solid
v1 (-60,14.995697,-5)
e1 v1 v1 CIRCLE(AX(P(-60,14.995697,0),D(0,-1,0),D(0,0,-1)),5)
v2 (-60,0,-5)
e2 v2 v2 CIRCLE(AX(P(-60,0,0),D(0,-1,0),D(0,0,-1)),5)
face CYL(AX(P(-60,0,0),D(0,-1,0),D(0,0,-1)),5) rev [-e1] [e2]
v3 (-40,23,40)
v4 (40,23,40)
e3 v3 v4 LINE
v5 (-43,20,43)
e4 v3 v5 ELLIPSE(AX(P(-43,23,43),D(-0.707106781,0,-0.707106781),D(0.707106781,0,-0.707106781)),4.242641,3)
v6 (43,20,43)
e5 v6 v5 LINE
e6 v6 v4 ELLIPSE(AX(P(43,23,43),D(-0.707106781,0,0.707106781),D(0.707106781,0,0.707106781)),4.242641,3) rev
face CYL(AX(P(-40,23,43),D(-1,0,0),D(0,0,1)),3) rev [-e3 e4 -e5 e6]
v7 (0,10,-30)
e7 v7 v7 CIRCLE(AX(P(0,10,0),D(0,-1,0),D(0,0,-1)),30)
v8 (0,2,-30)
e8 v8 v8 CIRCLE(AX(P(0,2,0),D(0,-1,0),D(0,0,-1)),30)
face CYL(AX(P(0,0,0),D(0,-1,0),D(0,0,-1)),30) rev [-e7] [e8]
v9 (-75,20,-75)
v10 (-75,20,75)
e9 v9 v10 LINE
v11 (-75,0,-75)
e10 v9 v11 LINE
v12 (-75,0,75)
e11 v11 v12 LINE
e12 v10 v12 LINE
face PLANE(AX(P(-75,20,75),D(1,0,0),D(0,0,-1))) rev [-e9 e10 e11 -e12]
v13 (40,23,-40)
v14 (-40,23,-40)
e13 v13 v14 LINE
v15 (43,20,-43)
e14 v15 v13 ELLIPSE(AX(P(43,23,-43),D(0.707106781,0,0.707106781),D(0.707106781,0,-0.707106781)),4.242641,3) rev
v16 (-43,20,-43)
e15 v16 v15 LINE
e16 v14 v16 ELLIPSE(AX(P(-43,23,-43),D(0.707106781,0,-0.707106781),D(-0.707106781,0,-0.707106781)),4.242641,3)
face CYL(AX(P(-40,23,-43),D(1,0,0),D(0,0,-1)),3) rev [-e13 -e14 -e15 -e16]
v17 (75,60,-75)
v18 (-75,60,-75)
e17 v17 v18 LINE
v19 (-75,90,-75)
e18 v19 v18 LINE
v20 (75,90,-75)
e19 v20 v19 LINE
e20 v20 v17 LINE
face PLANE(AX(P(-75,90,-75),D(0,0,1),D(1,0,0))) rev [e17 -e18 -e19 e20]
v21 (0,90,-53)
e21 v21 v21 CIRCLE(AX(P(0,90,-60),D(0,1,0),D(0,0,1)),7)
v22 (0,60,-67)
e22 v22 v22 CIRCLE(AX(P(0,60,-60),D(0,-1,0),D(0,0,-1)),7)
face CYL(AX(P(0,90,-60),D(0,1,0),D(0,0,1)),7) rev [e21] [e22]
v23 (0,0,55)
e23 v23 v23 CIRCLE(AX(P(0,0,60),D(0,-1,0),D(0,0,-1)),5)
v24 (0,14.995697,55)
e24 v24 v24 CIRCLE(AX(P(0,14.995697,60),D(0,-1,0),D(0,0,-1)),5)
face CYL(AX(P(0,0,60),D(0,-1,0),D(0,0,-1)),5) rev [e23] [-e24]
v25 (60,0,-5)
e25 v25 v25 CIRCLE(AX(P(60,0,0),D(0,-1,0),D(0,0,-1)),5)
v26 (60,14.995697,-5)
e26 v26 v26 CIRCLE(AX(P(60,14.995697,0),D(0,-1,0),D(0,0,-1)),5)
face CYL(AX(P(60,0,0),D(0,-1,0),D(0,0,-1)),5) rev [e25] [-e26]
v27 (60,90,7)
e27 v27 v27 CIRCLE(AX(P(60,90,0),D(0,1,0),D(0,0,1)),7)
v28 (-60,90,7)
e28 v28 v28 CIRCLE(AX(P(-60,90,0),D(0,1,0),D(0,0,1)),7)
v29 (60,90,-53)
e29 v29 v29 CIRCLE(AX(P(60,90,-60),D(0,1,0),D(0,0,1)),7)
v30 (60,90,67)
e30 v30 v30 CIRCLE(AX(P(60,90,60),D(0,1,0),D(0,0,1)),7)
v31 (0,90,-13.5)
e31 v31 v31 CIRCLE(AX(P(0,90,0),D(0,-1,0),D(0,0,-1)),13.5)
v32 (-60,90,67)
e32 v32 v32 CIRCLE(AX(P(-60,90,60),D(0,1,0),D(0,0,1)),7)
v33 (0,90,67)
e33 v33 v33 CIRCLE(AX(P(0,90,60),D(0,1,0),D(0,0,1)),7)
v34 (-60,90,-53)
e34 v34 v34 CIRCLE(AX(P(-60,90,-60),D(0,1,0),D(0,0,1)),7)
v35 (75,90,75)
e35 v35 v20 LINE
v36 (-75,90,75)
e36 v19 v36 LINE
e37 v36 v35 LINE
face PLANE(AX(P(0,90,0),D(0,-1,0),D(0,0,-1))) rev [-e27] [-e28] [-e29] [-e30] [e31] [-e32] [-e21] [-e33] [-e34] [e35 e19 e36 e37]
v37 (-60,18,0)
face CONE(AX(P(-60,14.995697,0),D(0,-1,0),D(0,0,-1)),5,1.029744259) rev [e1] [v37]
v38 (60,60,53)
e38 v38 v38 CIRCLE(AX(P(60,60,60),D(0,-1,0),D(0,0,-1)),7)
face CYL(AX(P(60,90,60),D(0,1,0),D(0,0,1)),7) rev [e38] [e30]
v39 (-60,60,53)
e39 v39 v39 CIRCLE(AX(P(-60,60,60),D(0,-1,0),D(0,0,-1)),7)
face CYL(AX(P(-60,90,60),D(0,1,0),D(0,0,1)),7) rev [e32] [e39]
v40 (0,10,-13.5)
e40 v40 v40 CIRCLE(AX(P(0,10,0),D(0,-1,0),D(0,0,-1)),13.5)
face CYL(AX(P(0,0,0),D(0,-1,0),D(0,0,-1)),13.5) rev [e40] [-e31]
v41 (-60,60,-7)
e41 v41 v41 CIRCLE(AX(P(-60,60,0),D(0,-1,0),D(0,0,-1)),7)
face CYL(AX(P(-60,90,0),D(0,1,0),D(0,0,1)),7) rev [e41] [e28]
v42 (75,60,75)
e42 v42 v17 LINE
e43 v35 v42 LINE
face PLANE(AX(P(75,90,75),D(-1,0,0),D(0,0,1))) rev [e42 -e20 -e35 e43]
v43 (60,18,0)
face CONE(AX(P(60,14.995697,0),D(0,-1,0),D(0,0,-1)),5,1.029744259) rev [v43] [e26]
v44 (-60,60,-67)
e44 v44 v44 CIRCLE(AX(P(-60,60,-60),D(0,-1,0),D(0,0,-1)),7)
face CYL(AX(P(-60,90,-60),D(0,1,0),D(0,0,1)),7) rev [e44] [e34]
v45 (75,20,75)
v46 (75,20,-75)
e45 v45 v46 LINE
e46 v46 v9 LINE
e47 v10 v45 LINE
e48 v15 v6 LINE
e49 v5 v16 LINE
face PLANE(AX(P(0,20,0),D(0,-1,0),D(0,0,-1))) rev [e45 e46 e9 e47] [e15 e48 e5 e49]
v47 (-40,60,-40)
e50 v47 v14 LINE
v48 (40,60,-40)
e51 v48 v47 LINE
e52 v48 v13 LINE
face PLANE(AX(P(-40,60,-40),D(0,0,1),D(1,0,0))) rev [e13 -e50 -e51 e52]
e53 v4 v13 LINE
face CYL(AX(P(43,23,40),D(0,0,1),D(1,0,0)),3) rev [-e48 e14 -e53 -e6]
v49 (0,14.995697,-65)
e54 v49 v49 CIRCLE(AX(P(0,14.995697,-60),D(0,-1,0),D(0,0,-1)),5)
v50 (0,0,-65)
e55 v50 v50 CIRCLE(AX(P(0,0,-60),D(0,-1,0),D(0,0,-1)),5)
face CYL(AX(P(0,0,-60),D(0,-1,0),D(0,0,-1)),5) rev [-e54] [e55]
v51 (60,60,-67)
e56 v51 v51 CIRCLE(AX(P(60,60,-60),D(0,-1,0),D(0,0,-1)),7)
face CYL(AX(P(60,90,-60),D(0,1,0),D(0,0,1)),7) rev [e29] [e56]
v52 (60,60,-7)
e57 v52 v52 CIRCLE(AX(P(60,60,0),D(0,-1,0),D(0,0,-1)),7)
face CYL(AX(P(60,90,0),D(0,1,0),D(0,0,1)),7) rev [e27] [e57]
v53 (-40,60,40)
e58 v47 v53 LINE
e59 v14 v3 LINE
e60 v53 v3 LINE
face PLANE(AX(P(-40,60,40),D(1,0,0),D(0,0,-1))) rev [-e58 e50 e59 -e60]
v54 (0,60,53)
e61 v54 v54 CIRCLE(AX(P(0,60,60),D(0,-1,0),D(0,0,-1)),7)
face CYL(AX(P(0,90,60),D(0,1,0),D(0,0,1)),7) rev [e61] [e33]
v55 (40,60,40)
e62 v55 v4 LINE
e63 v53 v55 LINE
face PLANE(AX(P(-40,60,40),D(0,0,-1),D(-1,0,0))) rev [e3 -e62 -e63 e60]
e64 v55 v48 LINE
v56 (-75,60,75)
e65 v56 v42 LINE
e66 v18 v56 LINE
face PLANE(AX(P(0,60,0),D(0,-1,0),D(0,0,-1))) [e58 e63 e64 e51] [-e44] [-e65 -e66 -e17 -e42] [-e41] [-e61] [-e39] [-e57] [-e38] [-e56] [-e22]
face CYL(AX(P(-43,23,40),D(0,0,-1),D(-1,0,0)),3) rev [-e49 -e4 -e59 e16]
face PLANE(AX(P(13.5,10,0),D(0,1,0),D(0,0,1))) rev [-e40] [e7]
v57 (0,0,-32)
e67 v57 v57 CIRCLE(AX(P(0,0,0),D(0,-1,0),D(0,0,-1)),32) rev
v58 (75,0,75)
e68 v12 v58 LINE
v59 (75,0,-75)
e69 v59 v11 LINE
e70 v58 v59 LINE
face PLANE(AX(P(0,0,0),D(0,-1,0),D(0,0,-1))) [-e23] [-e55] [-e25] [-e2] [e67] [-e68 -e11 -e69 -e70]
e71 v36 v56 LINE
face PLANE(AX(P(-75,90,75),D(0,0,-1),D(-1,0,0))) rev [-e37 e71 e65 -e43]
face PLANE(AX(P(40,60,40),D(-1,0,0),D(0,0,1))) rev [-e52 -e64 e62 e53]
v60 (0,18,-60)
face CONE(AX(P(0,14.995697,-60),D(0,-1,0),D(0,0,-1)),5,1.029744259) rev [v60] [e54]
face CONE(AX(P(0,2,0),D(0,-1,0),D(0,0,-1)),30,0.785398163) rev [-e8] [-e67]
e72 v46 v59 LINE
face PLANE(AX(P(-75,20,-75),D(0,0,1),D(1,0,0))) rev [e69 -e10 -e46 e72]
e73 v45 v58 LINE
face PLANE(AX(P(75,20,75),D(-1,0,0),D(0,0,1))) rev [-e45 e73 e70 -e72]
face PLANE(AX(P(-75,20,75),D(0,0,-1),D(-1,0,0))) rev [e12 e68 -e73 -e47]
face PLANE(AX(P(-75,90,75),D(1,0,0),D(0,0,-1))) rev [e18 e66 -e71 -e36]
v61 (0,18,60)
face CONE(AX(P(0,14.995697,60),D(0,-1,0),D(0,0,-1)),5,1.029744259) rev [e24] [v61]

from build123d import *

# Parameters (mm, degrees)
SKETCH1_W                      = 150
SKETCH1_H                      = 150
BOSS_EXTRUDE1_DEPTH            = 20
SKETCH2_W                      = 80
SKETCH2_H                      = 80
BOSS_EXTRUDE2_DEPTH            = 40
SKETCH3_W                      = 150
SKETCH3_H                      = 150
BOSS_EXTRUDE3_DEPTH            = 30
HOLE2_D                        = 27
HOLE2_CBORE_D                  = 60
HOLE2_CBORE_DEPTH              = 10
M16_START                      = 60
M16_TAPPED_HOLE1_OUTLINE_R     = 7
M16_TAPPED_HOLE1_DEPTH         = 30
F_10_0_10_DIAMETER_HOLE1_D     = 10
F_10_0_10_DIAMETER_HOLE1_DEPTH = 14.995696905
F_10_0_10_DIAMETER_HOLE1_TIP   = 3.004303095
FILLET1_R                      = 3
CHAMFER1_SIZE                  = 2


# Read off the part's stored shape, not the designer's step: M16 Tapped Hole1
with BuildPart() as part:
    # Sketch1 → Boss-Extrude1 (new body)
    with BuildSketch(Plane(origin=(0, 0, 0), x_dir=(1, 0, 0), z_dir=(0, 1, 0))):
        Rectangle(SKETCH1_W, SKETCH1_H)
    extrude(amount=BOSS_EXTRUDE1_DEPTH)

    # Sketch2 → Boss-Extrude2 (add)
    with BuildSketch(Plane(origin=(0, 20, 0), x_dir=(1, 0, 0), z_dir=(0, 1, 0))):
        Rectangle(SKETCH2_W, SKETCH2_H)
    extrude(amount=BOSS_EXTRUDE2_DEPTH)

    # Sketch3 → Boss-Extrude3 (add)
    with BuildSketch(Plane(origin=(0, 60, 0), x_dir=(1, 0, 0), z_dir=(0, 1, 0))):
        Rectangle(SKETCH3_W, SKETCH3_H)
    extrude(amount=BOSS_EXTRUDE3_DEPTH)

    # Hole2 (through all)
    with Locations(Plane(origin=(0, 0, 0), x_dir=(0, 0, -1), z_dir=(0, -1, 0))):
        with Locations((0, 0)):
            CounterBoreHole(HOLE2_D / 2, HOLE2_CBORE_D / 2, HOLE2_CBORE_DEPTH)

    # M16 Tapped Hole1 outline → M16 Tapped Hole1 (cut)
    with BuildSketch(Plane(origin=(0, 0, 0), x_dir=(1, 0, 0), z_dir=(0, 1, 0)).offset(M16_START)):
        with Locations((-60, 0)):
            Circle(M16_TAPPED_HOLE1_OUTLINE_R)
        with Locations((0, -60)):
            Circle(M16_TAPPED_HOLE1_OUTLINE_R)
        with Locations((60, 0)):
            Circle(M16_TAPPED_HOLE1_OUTLINE_R)
        with Locations((0, 60)):
            Circle(M16_TAPPED_HOLE1_OUTLINE_R)
        with Locations((60, -60)):
            Circle(M16_TAPPED_HOLE1_OUTLINE_R)
        with Locations((-60, 60)):
            Circle(M16_TAPPED_HOLE1_OUTLINE_R)
        with Locations((-60, -60)):
            Circle(M16_TAPPED_HOLE1_OUTLINE_R)
        with Locations((60, 60)):
            Circle(M16_TAPPED_HOLE1_OUTLINE_R)
    extrude(amount=M16_TAPPED_HOLE1_DEPTH, mode=Mode.SUBTRACT)

    # Ø10.0 (10) Diameter Hole1
    with Locations(Plane(origin=(0, 0, 0), x_dir=(-1, 0, 0), z_dir=(0, -1, 0))):
        with Locations((0, 0), (0, -60), (60, 0), (-60, 0), (0, 60)):
            Hole(F_10_0_10_DIAMETER_HOLE1_D / 2, depth=F_10_0_10_DIAMETER_HOLE1_DEPTH)
            with Locations((0, 0, -(F_10_0_10_DIAMETER_HOLE1_DEPTH + F_10_0_10_DIAMETER_HOLE1_TIP / 2))):  # 118° drill point
                Cone(0, F_10_0_10_DIAMETER_HOLE1_D / 2, F_10_0_10_DIAMETER_HOLE1_TIP, mode=Mode.SUBTRACT)

    # Fillet1
    fillet1_edges = [part.edges().sort_by_distance(p)[0] for p in [
        (40, 20, 0),
        (0, 20, -40),
        (-40, 20, 0),
        (0, 20, 40),
    ]]
    fillet(fillet1_edges, radius=FILLET1_R)

    # Chamfer1
    chamfer1_edges = [part.edges().sort_by_distance(p)[0] for p in [
        (0, 0, 30),
    ]]
    chamfer(chamfer1_edges, length=CHAMFER1_SIZE)


solid = part.part
